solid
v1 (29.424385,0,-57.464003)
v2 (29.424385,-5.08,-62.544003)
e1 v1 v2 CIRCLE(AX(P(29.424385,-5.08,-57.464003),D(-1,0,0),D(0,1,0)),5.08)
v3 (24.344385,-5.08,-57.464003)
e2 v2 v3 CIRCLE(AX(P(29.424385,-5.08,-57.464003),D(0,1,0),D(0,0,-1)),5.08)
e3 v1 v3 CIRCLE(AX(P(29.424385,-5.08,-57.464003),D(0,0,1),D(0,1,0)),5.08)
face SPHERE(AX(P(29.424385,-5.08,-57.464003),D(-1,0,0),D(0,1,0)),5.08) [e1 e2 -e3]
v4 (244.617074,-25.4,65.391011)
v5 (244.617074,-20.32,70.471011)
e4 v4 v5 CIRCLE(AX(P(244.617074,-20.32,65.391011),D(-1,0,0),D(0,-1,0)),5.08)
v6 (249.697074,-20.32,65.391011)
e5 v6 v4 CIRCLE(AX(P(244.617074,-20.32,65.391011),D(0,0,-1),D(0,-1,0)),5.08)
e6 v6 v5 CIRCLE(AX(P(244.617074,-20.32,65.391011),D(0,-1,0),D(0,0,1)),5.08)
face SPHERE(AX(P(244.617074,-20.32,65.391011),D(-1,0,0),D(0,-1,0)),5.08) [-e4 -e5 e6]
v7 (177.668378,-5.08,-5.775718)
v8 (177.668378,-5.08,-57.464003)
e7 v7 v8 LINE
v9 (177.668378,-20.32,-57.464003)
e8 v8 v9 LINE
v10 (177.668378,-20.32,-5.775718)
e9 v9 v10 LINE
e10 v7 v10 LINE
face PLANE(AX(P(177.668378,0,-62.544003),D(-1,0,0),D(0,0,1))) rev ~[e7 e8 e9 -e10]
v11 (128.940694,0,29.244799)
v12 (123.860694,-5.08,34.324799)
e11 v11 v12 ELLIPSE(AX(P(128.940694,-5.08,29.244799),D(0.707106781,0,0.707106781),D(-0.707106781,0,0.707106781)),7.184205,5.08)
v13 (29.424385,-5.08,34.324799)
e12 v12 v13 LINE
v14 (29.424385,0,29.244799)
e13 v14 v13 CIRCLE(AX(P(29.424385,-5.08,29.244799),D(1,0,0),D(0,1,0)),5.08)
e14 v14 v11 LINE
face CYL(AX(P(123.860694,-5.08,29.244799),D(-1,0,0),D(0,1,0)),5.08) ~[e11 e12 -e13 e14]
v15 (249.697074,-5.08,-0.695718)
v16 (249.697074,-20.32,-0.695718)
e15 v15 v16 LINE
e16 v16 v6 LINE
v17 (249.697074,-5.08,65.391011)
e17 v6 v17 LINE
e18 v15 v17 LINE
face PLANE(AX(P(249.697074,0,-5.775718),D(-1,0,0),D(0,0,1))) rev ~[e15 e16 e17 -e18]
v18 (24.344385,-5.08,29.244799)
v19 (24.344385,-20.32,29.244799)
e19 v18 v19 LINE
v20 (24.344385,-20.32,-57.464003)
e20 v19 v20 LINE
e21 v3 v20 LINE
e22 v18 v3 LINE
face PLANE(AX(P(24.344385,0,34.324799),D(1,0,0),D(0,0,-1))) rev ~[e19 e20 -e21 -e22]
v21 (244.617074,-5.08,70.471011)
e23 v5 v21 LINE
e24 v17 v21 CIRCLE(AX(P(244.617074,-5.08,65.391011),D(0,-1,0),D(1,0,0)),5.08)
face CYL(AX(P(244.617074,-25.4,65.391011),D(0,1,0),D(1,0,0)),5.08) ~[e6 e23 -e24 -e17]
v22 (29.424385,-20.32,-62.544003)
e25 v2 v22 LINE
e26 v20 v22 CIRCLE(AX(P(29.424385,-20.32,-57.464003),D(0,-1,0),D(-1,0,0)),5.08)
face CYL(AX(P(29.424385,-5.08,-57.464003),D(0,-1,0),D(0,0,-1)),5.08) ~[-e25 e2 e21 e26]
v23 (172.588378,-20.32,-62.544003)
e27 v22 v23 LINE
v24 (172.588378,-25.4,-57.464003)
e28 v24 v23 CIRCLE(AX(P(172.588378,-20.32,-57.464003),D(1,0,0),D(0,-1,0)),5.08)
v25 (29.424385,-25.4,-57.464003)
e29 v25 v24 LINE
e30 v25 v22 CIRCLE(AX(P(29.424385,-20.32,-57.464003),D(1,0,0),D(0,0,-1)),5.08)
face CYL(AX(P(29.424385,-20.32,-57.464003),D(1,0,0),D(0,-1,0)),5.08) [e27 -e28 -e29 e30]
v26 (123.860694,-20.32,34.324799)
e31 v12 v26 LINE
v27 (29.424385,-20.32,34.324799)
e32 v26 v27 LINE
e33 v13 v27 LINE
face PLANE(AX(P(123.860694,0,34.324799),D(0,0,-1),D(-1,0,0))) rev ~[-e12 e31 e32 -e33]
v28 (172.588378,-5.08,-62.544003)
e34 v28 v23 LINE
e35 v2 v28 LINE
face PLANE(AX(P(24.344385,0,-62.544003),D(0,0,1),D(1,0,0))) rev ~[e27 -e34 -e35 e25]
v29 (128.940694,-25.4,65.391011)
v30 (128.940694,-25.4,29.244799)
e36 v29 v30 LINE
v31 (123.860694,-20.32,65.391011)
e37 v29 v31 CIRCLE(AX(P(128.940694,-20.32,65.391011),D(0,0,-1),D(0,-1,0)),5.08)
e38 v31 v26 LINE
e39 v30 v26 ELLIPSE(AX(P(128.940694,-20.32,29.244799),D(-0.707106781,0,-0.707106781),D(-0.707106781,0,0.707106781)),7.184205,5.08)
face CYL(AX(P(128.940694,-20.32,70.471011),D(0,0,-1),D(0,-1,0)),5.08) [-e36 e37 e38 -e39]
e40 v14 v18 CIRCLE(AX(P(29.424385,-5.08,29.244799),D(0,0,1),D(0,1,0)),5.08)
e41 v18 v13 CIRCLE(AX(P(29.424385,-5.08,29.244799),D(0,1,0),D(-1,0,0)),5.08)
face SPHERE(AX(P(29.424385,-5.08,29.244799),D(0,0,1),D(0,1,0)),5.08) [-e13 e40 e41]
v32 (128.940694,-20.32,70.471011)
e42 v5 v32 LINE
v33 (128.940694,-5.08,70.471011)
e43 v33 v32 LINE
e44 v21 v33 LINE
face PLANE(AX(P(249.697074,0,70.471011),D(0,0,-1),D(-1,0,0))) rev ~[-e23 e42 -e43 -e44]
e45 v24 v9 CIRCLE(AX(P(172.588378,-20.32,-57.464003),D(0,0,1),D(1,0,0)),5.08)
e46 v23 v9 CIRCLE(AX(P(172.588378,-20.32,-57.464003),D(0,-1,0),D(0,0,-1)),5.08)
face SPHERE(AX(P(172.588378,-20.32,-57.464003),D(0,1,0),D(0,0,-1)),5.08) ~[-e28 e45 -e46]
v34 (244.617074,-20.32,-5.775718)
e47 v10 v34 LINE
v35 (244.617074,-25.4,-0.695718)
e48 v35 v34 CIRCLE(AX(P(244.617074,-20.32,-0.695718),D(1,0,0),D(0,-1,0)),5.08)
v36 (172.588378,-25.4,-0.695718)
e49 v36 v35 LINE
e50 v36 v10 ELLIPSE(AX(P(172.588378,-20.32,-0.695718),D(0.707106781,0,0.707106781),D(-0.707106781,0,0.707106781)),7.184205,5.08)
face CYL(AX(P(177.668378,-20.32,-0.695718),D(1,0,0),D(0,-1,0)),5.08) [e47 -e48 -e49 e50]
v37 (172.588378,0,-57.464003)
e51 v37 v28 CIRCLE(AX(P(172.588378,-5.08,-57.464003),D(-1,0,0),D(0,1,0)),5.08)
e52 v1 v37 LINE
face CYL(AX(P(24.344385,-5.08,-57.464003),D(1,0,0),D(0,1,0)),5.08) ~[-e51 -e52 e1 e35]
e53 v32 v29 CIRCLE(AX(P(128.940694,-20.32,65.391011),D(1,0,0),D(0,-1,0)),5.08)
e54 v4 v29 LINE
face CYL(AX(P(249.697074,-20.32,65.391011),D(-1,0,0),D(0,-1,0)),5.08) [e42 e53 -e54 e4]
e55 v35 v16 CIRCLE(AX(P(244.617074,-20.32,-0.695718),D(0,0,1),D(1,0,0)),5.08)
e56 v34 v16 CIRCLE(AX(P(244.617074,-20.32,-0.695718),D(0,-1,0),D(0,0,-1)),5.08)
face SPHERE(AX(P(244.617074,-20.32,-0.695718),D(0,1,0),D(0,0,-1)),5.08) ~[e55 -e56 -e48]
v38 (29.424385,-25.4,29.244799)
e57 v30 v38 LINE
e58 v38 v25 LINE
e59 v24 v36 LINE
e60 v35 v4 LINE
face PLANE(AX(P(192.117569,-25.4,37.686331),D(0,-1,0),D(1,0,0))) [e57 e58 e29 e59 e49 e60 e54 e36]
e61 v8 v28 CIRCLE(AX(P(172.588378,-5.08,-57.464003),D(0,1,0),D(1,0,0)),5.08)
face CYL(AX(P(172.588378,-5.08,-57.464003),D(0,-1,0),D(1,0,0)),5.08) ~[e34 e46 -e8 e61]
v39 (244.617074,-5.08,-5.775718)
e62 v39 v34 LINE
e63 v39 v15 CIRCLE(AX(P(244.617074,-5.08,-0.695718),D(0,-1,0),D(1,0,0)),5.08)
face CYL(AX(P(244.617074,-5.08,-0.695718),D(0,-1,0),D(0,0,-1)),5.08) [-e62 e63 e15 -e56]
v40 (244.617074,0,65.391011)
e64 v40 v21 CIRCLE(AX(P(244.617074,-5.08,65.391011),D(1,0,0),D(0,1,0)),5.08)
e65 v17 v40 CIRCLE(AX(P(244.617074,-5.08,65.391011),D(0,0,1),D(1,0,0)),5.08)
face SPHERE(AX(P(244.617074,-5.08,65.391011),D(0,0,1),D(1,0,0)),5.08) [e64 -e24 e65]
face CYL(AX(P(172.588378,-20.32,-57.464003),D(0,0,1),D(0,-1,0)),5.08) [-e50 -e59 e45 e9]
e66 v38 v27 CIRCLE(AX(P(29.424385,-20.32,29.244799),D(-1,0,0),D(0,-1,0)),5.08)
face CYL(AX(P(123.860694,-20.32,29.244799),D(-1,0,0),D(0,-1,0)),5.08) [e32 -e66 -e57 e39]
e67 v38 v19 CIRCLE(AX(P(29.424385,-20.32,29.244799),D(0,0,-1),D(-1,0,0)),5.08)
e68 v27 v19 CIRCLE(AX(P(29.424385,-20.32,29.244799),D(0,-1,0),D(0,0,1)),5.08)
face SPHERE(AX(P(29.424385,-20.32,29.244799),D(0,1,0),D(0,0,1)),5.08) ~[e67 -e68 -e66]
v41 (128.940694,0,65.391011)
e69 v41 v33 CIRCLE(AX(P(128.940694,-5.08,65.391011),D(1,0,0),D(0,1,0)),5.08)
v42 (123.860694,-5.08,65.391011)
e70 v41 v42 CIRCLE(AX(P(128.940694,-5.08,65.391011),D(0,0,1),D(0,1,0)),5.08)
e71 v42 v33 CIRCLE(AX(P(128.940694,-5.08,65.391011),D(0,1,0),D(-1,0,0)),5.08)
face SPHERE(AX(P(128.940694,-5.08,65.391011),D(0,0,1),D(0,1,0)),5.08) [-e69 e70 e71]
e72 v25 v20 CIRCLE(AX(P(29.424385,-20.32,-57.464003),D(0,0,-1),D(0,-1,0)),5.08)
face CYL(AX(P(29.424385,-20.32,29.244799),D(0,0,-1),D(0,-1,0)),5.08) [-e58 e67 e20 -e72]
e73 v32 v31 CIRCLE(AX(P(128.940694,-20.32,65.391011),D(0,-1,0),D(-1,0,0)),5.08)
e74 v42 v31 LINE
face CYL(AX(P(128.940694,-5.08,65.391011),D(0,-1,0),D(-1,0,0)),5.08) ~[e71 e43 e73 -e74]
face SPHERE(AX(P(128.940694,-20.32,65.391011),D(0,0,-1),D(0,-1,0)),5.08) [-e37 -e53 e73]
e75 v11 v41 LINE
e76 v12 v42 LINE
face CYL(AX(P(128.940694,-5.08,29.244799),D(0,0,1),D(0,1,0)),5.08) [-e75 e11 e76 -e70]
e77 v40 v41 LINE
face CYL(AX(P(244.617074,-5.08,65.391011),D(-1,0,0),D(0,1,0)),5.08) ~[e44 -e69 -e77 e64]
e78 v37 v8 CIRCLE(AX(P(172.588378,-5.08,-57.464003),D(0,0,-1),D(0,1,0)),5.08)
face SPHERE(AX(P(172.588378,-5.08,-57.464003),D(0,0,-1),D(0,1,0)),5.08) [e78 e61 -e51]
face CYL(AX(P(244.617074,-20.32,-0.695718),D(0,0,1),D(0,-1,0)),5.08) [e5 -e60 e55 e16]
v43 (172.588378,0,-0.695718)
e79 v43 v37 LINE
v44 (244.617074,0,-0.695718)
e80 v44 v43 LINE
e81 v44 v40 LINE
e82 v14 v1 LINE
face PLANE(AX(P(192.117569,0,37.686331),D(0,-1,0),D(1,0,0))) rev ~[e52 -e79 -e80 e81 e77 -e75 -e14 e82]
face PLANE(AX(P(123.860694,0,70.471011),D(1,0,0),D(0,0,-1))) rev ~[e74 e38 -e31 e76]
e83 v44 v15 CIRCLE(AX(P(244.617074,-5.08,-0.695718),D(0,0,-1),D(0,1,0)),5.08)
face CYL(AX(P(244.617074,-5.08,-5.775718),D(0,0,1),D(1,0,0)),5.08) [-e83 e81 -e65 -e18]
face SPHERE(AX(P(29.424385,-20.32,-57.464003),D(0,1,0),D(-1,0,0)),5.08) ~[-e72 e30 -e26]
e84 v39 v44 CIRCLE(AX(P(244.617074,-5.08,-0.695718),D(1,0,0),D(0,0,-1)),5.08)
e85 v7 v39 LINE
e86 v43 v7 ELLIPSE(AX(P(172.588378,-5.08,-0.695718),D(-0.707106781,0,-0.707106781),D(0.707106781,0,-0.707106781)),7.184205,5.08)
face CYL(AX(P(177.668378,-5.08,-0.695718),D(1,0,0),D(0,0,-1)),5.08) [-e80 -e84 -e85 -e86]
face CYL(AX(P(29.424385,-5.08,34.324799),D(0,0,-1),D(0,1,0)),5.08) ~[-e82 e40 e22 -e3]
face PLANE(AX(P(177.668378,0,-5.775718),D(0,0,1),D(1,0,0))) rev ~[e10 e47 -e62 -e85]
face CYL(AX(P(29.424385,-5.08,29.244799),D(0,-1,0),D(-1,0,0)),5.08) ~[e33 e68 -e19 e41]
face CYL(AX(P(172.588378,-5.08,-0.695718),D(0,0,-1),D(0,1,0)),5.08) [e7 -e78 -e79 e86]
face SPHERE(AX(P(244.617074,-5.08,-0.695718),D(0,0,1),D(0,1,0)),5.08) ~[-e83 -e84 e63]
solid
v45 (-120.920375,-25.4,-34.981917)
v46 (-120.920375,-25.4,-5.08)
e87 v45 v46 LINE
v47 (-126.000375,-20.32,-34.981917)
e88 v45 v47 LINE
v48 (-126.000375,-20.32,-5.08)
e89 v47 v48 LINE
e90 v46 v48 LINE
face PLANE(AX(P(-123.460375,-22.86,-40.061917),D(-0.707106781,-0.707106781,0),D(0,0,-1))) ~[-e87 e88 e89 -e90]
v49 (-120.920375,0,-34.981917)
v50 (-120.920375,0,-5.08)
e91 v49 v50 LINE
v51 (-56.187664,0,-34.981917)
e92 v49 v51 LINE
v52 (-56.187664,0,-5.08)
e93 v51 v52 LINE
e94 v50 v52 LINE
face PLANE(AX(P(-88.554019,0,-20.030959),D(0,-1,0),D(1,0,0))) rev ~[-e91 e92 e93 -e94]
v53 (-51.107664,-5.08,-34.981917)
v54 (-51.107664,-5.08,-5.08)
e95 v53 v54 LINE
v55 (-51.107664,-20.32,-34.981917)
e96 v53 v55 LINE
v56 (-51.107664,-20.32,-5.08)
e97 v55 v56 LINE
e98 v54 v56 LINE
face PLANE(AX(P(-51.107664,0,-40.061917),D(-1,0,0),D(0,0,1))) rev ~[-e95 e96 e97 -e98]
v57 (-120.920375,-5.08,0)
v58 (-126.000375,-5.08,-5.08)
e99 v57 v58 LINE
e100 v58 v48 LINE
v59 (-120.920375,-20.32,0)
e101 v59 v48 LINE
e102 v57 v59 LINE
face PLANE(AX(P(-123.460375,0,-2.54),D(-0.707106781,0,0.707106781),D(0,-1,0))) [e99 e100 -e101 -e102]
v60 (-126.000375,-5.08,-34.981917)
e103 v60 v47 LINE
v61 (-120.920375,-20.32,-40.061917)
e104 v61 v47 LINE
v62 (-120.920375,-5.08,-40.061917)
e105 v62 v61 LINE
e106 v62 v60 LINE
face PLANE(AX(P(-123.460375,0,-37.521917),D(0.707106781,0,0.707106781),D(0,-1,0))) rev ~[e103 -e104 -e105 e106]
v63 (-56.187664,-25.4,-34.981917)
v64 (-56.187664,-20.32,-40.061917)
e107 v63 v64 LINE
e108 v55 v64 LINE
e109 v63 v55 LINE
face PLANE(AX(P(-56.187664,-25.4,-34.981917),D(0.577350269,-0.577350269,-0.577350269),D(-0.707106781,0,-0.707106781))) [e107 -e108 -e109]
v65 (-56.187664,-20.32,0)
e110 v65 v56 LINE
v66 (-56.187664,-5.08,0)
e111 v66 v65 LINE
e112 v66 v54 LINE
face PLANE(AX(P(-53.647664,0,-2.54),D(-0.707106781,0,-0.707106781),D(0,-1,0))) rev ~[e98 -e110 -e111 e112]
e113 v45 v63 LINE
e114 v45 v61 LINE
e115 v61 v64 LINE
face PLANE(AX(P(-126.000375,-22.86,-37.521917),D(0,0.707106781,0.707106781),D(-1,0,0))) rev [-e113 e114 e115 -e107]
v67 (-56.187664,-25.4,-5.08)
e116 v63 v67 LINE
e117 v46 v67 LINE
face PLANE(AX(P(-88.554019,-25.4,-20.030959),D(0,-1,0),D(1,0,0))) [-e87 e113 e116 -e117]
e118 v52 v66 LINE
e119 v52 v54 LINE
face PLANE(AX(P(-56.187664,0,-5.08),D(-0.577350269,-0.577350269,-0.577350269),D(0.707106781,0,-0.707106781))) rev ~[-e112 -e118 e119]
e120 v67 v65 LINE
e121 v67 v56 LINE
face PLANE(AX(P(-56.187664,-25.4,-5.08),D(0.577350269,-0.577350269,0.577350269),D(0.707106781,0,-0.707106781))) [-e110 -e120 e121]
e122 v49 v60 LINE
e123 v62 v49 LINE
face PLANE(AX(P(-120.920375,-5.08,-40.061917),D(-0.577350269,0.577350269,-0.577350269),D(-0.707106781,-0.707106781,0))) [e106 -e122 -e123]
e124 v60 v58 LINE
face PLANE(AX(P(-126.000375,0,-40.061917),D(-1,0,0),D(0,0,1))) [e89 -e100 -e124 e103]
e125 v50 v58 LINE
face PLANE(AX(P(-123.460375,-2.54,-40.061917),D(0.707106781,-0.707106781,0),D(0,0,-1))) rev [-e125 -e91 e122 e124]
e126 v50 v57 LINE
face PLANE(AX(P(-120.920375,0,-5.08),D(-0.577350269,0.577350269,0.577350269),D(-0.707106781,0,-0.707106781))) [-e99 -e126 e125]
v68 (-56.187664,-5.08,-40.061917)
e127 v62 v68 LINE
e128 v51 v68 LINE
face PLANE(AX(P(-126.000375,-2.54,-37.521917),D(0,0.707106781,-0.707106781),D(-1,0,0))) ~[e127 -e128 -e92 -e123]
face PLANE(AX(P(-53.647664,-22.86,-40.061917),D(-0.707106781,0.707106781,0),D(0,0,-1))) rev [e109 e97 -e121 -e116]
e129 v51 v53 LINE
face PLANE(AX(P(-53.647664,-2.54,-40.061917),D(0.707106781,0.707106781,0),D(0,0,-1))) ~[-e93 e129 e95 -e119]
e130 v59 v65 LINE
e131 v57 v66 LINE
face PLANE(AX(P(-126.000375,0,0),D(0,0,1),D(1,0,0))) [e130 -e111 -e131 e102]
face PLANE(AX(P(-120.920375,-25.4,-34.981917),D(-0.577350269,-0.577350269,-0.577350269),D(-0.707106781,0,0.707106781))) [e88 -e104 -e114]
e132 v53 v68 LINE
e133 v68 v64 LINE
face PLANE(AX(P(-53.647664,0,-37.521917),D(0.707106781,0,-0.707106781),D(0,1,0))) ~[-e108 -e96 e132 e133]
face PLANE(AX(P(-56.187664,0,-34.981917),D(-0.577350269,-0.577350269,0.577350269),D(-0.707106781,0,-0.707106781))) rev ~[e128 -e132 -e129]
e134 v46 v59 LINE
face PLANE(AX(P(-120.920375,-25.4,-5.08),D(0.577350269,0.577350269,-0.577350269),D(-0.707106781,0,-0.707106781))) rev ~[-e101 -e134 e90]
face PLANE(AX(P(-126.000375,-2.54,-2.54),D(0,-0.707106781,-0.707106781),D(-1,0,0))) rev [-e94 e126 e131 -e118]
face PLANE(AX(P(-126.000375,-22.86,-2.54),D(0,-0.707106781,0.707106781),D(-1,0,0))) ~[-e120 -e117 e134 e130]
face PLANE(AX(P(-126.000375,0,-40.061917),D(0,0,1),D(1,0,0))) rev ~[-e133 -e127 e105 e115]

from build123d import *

# Parameters (mm, degrees)
F0_W     = 74.8927108943
F0_H     = 40.061917156
F1_DEPTH = 25.4
F0_W_2   = 83.2777917385
F0_H_2   = 54.8879876733
F0_W_3   = 53.8076832891
F0_H_3   = 40.1005172171
F2_R     = 5.08
F3_R     = 5.08
F4_R     = 5.08
F5_R     = 5.08
F6_R     = 5.08
F7_R     = 5.08
F9_R     = 5.08
F10_R    = 5.08
F12_SIZE = 5.08


# Not quite as in the source:
# - a feature of the source that left no trace in its solid (it failed there, or was rolled back) is left out


with BuildPart() as f1:
    # F0 (on Front) → F1 (new body)
    with BuildSketch(Plane.XZ):
        with Locations((-88.5540191084, -20.030958578)):
            Rectangle(F0_W, F0_H)
    extrude(amount=F1_DEPTH)

    # F12
    f12_edges = [f1.edges().sort_by_distance(p)[0] for p in [
        (-51.107664, -12.7, 0),
        (-126.000375, -12.7, 0),
        (-88.554019, 0, 0),
        (-88.554019, -25.4, 0),
        (-51.107664, -12.7, -40.061917),
        (-51.107664, 0, -20.030959),
        (-51.107664, -25.4, -20.030959),
        (-126.000375, 0, -20.030959),
        (-88.554019, 0, -40.061917),
        (-126.000375, -12.7, -40.061917),
        (-88.554019, -25.4, -40.061917),
        (-126.000375, -25.4, -20.030959),
    ]]
    chamfer(f12_edges, length=F12_SIZE)


with BuildPart() as f1b:
    # F0 (on Front) → F1, piece 2 (new body)
    with BuildSketch(Plane.XZ):
        with Locations((-227.9445976019, -110.2393232286)):
            Rectangle(F0_W_2, F0_H_2)
    extrude(amount=F1_DEPTH)


with BuildPart() as f1c:
    # F0 (on Front) → F1, piece 3 (new body)
    with BuildSketch(Plane.XZ):
        Polygon((249.6970742941, -5.7757184841), (249.6970742941, 70.4710111022), (123.860694468, 70.4710111022), (123.860694468, 34.324798733), (177.6683777571, 34.324798733), (177.6683777571, -5.7757184841), align=None)
        with Locations((150.7645361125, 14.2745401245)):
            Rectangle(F0_W_3, F0_H_3)
        Polygon((123.860694468, -5.7757184841), (123.860694468, 34.324798733), (24.3443846703, 34.324798733), (24.3443846703, -62.544003129), (177.6683777571, -62.544003129), (177.6683777571, -5.7757184841), align=None)
    extrude(amount=F1_DEPTH)

    # F2
    f2_edges = [f1c.edges().sort_by_distance(p)[0] for p in [
        (249.697074, 0, 32.347646),
    ]]
    fillet(f2_edges, radius=F2_R)

    # F3
    f3_edges = [f1c.edges().sort_by_distance(p)[0] for p in [
        (211.142726, 0, -5.775718),
    ]]
    fillet(f3_edges, radius=F3_R)

    # F4
    f4_edges = [f1c.edges().sort_by_distance(p)[0] for p in [
        (177.668378, 0, -34.159861),
    ]]
    fillet(f4_edges, radius=F4_R)

    # F5
    f5_edges = [f1c.edges().sort_by_distance(p)[0] for p in [
        (98.466381, 0, -62.544003),
    ]]
    fillet(f5_edges, radius=F5_R)

    # F6
    f6_edges = [f1c.edges().sort_by_distance(p)[0] for p in [
        (24.344385, 0, -11.569602),
    ]]
    fillet(f6_edges, radius=F6_R)

    # F7
    f7_edges = [f1c.edges().sort_by_distance(p)[0] for p in [
        (76.64254, 0, 34.324799),
    ]]
    fillet(f7_edges, radius=F7_R)

    # F9
    f9_edges = [f1c.edges().sort_by_distance(p)[0] for p in [
        (123.860694, 0, 31.784799),
    ]]
    fillet(f9_edges, radius=F9_R)

    # F10
    f10_edges = [f1c.edges().sort_by_distance(p)[0] for p in [
        (24.344385, -25.4, -14.109602),
        (25.832282, -25.4, 32.836901),
        (25.832282, -25.4, -61.056106),
        (76.64254, -25.4, 34.324799),
        (101.006381, -25.4, -62.544003),
        (123.860694, -25.4, 52.397905),
        (176.18048, -25.4, -61.056106),
        (186.778884, -25.4, 70.471011),
        (177.668378, -25.4, -31.619861),
        (249.697074, -25.4, 34.887646),
        (211.142726, -25.4, -5.775718),
        (248.209177, -25.4, -4.287821),
        (186.778884, 0, 70.471011),
        (125.348592, -1.487898, 70.471011),
        (248.209177, -1.487898, 70.471011),
    ]]
    fillet(f10_edges, radius=F10_R)


solid = Compound([f1.part, f1c.part])
